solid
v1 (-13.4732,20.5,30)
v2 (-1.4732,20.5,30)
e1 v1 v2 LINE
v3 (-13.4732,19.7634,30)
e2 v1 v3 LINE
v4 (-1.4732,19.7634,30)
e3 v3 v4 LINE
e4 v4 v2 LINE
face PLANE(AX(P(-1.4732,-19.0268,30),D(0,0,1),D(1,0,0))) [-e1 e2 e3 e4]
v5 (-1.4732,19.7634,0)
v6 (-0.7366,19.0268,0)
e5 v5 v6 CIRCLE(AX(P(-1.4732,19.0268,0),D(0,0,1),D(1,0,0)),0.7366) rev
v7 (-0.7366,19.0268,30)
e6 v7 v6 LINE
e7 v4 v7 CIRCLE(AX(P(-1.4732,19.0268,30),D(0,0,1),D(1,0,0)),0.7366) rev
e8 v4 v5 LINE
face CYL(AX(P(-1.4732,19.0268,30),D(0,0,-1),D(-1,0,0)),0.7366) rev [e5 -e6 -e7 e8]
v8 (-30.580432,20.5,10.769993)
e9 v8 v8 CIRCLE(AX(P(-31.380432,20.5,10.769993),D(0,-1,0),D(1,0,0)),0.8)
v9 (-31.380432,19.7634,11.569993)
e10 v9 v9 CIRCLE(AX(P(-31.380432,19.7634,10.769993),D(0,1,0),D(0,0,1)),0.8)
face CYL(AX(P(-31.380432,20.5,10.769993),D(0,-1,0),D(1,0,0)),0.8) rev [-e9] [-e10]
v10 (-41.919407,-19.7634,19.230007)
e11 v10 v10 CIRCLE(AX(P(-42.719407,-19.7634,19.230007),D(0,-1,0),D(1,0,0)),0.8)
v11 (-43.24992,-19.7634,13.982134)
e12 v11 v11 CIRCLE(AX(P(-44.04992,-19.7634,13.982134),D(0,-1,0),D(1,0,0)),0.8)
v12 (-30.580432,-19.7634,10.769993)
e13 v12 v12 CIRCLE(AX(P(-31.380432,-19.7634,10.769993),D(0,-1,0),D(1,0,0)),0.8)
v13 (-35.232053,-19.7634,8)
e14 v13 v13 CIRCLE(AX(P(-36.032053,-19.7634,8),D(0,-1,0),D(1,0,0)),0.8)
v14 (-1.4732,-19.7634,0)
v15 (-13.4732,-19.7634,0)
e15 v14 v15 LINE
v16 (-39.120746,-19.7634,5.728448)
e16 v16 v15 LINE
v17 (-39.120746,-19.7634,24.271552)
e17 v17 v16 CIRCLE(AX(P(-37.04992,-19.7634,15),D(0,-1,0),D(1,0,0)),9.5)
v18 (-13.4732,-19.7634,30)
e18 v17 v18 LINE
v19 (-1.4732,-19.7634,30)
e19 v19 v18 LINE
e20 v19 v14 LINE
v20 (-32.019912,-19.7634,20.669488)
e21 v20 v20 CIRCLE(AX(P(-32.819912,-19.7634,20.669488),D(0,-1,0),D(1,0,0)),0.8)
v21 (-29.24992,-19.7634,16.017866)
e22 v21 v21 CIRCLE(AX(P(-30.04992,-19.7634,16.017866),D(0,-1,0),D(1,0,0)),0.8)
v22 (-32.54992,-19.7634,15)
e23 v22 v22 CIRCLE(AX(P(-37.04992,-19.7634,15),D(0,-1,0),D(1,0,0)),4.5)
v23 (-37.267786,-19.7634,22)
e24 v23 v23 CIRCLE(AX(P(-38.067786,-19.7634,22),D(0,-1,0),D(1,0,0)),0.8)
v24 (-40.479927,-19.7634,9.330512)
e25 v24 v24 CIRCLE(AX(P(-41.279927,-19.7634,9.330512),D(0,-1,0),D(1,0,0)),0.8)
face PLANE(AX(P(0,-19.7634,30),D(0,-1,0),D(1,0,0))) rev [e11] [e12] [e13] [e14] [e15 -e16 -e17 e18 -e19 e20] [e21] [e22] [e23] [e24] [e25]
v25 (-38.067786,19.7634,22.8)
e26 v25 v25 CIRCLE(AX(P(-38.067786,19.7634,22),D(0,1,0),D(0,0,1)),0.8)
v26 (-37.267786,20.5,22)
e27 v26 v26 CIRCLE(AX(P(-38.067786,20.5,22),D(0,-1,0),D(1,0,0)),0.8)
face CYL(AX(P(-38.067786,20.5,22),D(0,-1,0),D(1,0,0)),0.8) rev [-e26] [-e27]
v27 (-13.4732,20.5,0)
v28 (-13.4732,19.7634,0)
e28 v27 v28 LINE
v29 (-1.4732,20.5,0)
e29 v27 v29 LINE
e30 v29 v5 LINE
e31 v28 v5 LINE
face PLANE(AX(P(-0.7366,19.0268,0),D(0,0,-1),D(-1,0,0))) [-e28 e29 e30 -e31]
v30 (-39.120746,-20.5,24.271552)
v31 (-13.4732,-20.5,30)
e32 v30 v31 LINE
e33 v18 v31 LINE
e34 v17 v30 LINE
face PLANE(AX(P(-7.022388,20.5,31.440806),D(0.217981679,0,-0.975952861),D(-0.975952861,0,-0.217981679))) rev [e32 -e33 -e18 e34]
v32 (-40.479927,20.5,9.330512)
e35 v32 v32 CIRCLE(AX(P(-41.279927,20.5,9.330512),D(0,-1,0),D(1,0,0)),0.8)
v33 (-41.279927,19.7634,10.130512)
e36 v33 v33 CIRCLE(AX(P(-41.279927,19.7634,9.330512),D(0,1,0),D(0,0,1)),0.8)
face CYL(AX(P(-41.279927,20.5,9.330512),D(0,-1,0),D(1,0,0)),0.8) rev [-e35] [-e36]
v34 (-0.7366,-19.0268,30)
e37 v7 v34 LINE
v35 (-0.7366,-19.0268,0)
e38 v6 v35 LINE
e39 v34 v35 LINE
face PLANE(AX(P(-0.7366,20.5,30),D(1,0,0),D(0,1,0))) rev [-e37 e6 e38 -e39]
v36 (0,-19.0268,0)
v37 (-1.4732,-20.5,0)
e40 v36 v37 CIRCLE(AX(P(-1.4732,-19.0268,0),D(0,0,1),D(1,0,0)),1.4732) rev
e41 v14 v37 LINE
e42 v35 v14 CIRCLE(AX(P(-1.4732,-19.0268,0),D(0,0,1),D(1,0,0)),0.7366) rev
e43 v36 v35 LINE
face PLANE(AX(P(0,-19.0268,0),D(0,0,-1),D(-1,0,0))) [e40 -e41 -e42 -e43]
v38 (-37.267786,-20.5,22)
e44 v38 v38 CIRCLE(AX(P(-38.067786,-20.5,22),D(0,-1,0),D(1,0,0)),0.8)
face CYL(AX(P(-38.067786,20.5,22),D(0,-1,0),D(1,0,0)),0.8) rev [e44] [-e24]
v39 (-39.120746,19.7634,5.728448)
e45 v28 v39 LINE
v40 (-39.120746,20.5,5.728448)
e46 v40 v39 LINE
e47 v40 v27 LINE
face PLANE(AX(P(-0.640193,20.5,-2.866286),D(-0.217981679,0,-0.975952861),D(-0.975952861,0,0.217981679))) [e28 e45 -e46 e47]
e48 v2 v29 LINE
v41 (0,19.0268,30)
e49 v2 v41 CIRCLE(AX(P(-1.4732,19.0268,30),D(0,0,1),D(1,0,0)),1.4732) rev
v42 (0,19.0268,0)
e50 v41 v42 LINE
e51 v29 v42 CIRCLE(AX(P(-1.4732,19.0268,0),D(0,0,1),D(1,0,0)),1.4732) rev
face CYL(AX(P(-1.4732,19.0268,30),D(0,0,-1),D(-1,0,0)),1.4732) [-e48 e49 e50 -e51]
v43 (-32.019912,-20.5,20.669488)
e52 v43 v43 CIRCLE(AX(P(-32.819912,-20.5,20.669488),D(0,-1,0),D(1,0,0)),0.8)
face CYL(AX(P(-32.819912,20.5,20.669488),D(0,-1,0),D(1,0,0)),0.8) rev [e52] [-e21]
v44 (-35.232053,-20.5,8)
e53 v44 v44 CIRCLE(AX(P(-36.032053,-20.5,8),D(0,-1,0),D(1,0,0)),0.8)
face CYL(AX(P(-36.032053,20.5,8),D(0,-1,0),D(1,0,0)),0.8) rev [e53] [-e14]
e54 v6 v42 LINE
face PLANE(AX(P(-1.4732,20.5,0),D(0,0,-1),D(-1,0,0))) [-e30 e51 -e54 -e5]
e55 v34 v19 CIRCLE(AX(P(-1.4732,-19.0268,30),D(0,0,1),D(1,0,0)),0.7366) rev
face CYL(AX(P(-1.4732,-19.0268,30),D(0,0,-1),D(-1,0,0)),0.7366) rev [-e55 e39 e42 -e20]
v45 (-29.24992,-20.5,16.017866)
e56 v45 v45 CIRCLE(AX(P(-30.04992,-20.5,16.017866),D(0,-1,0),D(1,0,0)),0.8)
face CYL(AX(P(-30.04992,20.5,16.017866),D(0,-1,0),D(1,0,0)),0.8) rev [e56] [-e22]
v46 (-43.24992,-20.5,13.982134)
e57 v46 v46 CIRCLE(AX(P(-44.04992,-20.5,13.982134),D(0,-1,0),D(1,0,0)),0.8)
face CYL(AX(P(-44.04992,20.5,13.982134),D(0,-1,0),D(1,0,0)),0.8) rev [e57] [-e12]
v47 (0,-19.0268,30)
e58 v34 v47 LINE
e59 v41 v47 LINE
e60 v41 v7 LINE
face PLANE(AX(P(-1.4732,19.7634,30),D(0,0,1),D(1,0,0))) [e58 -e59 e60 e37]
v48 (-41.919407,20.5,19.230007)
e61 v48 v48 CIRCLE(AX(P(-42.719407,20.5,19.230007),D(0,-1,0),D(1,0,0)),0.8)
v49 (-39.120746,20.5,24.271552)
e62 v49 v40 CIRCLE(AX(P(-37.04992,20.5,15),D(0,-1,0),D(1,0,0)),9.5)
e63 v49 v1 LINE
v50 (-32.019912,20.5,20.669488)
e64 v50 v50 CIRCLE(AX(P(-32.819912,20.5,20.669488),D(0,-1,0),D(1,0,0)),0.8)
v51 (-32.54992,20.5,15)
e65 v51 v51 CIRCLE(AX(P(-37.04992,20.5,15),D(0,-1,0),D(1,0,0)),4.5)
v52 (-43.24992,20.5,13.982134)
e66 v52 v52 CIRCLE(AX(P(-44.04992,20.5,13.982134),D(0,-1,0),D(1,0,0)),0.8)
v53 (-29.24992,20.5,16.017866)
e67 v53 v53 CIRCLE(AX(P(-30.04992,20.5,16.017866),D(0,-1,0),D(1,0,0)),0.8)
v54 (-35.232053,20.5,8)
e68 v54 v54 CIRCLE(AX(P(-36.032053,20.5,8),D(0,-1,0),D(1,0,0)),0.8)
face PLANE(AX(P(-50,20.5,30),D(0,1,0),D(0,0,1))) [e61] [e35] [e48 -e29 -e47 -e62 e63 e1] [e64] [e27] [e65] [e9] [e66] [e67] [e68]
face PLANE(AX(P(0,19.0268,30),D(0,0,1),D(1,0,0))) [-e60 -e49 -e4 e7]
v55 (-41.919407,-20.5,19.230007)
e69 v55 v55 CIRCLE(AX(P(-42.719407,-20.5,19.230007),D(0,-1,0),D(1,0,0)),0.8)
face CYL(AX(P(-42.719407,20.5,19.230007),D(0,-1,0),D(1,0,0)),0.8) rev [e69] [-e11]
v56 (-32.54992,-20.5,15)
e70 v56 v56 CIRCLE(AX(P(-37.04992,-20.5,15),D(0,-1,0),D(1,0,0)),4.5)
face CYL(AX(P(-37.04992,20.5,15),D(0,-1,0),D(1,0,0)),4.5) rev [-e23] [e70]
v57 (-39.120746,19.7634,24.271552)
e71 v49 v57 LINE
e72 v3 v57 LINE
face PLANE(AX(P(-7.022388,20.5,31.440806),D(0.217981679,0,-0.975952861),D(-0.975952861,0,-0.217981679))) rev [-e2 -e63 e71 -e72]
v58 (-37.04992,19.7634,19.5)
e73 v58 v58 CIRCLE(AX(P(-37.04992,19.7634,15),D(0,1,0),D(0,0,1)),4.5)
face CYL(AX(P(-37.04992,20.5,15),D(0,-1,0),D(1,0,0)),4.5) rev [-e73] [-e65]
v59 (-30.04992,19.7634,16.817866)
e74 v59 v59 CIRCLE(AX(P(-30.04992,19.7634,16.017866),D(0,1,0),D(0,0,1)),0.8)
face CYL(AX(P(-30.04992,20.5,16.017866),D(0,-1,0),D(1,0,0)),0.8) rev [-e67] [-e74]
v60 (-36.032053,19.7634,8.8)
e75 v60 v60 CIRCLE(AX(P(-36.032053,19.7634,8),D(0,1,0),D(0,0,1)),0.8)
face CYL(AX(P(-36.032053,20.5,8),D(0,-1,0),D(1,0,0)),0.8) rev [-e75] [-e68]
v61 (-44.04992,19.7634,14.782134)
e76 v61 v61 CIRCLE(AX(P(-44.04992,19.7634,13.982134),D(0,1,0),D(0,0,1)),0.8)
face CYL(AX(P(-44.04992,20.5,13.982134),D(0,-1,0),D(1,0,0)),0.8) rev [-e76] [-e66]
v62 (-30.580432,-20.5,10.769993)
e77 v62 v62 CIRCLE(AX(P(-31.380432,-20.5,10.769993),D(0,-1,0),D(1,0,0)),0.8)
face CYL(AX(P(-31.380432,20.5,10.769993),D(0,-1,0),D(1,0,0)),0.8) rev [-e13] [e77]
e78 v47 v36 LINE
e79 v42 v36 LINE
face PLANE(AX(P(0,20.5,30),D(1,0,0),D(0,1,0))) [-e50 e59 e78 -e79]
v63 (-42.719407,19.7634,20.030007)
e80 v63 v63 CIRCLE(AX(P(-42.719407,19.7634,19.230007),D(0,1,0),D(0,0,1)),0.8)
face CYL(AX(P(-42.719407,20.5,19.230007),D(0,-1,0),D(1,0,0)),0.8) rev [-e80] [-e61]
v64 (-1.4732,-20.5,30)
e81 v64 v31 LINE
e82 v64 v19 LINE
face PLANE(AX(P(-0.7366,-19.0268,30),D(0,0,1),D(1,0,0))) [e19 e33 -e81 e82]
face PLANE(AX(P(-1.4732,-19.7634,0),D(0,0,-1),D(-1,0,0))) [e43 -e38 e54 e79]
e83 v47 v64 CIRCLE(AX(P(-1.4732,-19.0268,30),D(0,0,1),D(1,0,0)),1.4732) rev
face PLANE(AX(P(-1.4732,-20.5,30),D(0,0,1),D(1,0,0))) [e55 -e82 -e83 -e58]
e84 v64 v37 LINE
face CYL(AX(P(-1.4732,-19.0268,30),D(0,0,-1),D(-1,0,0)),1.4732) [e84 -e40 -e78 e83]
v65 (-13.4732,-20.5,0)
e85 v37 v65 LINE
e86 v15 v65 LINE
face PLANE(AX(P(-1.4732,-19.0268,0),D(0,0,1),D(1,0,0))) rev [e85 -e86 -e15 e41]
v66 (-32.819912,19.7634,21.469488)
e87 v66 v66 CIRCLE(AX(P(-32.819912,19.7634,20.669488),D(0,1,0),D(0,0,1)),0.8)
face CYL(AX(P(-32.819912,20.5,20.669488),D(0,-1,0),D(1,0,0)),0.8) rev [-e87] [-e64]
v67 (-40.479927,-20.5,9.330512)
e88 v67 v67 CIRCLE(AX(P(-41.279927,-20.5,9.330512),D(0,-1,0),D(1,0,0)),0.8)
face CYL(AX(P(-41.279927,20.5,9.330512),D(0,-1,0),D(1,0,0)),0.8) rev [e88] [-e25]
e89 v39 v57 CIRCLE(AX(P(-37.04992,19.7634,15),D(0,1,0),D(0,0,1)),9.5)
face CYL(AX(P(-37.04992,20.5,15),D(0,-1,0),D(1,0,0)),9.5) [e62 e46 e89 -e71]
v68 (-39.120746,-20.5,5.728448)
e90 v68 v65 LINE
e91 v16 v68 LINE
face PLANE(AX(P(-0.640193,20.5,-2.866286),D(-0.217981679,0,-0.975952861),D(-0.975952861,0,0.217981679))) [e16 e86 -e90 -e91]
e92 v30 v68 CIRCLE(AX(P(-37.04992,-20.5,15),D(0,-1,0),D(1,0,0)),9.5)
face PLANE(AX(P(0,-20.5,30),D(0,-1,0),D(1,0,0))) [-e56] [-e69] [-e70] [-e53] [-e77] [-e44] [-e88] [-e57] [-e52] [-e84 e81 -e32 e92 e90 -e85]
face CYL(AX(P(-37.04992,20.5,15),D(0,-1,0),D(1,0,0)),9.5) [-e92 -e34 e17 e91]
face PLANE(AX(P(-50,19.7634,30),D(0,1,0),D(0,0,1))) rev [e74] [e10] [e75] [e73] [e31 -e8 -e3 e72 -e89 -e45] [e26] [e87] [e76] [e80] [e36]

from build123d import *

# Parameters (mm, degrees)
T_LE_DE_BASE_PLI_E1_DEPTH = 30
ESQUISSE13_R              = 4.5
ESQUISSE13_R_2            = 0.8
ENL_V_MAT_EXTRU_2_DEPTH   = 72.281133549


# Sheet-metal steps are written as plain solids
with BuildPart() as part:
    # Esquisse1 → Tôle de base pliée1 (new body)
    with BuildSketch(Plane.XY):
        with BuildLine():
            Line((-50, 20.5), (-1.4732, 20.5))
            ThreePointArc((-1.4732, 20.5), (-0.43149029, 20.06850971), (0, 19.0268))
            Line((0, 19.0268), (0, -19.0268))
            ThreePointArc((0, -19.0268), (-0.43149029, -20.06850971), (-1.4732, -20.5))
            Line((-1.4732, -20.5), (-50, -20.5))
            Line((-50, -20.5), (-50, -19.7634))
            Line((-50, -19.7634), (-1.4732, -19.7634))
            ThreePointArc((-1.4732, -19.7634), (-0.952345145, -19.547654855), (-0.7366, -19.0268))
            Line((-0.7366, -19.0268), (-0.7366, 19.0268))
            ThreePointArc((-0.7366, 19.0268), (-0.952345145, 19.547654855), (-1.4732, 19.7634))
            Line((-1.4732, 19.7634), (-50, 19.7634))
            Line((-50, 19.7634), (-50, 20.5))
        make_face()
    extrude(amount=T_LE_DE_BASE_PLI_E1_DEPTH)

    # Esquisse13 → Enlèv. mat.-Extru.2 (cut, through all)
    with BuildSketch(Plane.XZ.offset(20.5)):
        with BuildLine():
            ThreePointArc((-46.549919552, 15), (-44.463516741, 20.940418901), (-39.120745506, 24.271552182))
            Line((-39.120745506, 24.271552182), (-13.4732, 30))
            Line((-13.4732, 30), (-50, 30))
            Line((-50, 30), (-50, 15))
            Line((-50, 15), (-46.549919552, 15))
        make_face()
        with BuildLine():
            Line((-13.4732, 0), (-39.120745506, 5.728447818))
            ThreePointArc((-39.120745506, 5.728447818), (-44.463516741, 9.059581099), (-46.549919552, 15))
            Line((-46.549919552, 15), (-50, 15))
            Line((-50, 15), (-50, 0))
            Line((-50, 0), (-13.4732, 0))
        make_face()
        with Locations((-37.049919552, 15)):
            Circle(ESQUISSE13_R)
        with Locations((-30.049919552, 16.017866465)):
            Circle(ESQUISSE13_R_2)
        with Locations((-32.819912364, 20.669487748)):
            Circle(ESQUISSE13_R_2)
        with Locations((-38.067786017, 22)):
            Circle(ESQUISSE13_R_2)
        with Locations((-42.7194073, 19.230007189)):
            Circle(ESQUISSE13_R_2)
        with Locations((-44.049919552, 13.982133535)):
            Circle(ESQUISSE13_R_2)
        with Locations((-41.279926741, 9.330512252)):
            Circle(ESQUISSE13_R_2)
        with Locations((-36.032053088, 8)):
            Circle(ESQUISSE13_R_2)
        with Locations((-31.380431805, 10.769992811)):
            Circle(ESQUISSE13_R_2)
    extrude(amount=-ENL_V_MAT_EXTRU_2_DEPTH, mode=Mode.SUBTRACT)


solid = part.part
